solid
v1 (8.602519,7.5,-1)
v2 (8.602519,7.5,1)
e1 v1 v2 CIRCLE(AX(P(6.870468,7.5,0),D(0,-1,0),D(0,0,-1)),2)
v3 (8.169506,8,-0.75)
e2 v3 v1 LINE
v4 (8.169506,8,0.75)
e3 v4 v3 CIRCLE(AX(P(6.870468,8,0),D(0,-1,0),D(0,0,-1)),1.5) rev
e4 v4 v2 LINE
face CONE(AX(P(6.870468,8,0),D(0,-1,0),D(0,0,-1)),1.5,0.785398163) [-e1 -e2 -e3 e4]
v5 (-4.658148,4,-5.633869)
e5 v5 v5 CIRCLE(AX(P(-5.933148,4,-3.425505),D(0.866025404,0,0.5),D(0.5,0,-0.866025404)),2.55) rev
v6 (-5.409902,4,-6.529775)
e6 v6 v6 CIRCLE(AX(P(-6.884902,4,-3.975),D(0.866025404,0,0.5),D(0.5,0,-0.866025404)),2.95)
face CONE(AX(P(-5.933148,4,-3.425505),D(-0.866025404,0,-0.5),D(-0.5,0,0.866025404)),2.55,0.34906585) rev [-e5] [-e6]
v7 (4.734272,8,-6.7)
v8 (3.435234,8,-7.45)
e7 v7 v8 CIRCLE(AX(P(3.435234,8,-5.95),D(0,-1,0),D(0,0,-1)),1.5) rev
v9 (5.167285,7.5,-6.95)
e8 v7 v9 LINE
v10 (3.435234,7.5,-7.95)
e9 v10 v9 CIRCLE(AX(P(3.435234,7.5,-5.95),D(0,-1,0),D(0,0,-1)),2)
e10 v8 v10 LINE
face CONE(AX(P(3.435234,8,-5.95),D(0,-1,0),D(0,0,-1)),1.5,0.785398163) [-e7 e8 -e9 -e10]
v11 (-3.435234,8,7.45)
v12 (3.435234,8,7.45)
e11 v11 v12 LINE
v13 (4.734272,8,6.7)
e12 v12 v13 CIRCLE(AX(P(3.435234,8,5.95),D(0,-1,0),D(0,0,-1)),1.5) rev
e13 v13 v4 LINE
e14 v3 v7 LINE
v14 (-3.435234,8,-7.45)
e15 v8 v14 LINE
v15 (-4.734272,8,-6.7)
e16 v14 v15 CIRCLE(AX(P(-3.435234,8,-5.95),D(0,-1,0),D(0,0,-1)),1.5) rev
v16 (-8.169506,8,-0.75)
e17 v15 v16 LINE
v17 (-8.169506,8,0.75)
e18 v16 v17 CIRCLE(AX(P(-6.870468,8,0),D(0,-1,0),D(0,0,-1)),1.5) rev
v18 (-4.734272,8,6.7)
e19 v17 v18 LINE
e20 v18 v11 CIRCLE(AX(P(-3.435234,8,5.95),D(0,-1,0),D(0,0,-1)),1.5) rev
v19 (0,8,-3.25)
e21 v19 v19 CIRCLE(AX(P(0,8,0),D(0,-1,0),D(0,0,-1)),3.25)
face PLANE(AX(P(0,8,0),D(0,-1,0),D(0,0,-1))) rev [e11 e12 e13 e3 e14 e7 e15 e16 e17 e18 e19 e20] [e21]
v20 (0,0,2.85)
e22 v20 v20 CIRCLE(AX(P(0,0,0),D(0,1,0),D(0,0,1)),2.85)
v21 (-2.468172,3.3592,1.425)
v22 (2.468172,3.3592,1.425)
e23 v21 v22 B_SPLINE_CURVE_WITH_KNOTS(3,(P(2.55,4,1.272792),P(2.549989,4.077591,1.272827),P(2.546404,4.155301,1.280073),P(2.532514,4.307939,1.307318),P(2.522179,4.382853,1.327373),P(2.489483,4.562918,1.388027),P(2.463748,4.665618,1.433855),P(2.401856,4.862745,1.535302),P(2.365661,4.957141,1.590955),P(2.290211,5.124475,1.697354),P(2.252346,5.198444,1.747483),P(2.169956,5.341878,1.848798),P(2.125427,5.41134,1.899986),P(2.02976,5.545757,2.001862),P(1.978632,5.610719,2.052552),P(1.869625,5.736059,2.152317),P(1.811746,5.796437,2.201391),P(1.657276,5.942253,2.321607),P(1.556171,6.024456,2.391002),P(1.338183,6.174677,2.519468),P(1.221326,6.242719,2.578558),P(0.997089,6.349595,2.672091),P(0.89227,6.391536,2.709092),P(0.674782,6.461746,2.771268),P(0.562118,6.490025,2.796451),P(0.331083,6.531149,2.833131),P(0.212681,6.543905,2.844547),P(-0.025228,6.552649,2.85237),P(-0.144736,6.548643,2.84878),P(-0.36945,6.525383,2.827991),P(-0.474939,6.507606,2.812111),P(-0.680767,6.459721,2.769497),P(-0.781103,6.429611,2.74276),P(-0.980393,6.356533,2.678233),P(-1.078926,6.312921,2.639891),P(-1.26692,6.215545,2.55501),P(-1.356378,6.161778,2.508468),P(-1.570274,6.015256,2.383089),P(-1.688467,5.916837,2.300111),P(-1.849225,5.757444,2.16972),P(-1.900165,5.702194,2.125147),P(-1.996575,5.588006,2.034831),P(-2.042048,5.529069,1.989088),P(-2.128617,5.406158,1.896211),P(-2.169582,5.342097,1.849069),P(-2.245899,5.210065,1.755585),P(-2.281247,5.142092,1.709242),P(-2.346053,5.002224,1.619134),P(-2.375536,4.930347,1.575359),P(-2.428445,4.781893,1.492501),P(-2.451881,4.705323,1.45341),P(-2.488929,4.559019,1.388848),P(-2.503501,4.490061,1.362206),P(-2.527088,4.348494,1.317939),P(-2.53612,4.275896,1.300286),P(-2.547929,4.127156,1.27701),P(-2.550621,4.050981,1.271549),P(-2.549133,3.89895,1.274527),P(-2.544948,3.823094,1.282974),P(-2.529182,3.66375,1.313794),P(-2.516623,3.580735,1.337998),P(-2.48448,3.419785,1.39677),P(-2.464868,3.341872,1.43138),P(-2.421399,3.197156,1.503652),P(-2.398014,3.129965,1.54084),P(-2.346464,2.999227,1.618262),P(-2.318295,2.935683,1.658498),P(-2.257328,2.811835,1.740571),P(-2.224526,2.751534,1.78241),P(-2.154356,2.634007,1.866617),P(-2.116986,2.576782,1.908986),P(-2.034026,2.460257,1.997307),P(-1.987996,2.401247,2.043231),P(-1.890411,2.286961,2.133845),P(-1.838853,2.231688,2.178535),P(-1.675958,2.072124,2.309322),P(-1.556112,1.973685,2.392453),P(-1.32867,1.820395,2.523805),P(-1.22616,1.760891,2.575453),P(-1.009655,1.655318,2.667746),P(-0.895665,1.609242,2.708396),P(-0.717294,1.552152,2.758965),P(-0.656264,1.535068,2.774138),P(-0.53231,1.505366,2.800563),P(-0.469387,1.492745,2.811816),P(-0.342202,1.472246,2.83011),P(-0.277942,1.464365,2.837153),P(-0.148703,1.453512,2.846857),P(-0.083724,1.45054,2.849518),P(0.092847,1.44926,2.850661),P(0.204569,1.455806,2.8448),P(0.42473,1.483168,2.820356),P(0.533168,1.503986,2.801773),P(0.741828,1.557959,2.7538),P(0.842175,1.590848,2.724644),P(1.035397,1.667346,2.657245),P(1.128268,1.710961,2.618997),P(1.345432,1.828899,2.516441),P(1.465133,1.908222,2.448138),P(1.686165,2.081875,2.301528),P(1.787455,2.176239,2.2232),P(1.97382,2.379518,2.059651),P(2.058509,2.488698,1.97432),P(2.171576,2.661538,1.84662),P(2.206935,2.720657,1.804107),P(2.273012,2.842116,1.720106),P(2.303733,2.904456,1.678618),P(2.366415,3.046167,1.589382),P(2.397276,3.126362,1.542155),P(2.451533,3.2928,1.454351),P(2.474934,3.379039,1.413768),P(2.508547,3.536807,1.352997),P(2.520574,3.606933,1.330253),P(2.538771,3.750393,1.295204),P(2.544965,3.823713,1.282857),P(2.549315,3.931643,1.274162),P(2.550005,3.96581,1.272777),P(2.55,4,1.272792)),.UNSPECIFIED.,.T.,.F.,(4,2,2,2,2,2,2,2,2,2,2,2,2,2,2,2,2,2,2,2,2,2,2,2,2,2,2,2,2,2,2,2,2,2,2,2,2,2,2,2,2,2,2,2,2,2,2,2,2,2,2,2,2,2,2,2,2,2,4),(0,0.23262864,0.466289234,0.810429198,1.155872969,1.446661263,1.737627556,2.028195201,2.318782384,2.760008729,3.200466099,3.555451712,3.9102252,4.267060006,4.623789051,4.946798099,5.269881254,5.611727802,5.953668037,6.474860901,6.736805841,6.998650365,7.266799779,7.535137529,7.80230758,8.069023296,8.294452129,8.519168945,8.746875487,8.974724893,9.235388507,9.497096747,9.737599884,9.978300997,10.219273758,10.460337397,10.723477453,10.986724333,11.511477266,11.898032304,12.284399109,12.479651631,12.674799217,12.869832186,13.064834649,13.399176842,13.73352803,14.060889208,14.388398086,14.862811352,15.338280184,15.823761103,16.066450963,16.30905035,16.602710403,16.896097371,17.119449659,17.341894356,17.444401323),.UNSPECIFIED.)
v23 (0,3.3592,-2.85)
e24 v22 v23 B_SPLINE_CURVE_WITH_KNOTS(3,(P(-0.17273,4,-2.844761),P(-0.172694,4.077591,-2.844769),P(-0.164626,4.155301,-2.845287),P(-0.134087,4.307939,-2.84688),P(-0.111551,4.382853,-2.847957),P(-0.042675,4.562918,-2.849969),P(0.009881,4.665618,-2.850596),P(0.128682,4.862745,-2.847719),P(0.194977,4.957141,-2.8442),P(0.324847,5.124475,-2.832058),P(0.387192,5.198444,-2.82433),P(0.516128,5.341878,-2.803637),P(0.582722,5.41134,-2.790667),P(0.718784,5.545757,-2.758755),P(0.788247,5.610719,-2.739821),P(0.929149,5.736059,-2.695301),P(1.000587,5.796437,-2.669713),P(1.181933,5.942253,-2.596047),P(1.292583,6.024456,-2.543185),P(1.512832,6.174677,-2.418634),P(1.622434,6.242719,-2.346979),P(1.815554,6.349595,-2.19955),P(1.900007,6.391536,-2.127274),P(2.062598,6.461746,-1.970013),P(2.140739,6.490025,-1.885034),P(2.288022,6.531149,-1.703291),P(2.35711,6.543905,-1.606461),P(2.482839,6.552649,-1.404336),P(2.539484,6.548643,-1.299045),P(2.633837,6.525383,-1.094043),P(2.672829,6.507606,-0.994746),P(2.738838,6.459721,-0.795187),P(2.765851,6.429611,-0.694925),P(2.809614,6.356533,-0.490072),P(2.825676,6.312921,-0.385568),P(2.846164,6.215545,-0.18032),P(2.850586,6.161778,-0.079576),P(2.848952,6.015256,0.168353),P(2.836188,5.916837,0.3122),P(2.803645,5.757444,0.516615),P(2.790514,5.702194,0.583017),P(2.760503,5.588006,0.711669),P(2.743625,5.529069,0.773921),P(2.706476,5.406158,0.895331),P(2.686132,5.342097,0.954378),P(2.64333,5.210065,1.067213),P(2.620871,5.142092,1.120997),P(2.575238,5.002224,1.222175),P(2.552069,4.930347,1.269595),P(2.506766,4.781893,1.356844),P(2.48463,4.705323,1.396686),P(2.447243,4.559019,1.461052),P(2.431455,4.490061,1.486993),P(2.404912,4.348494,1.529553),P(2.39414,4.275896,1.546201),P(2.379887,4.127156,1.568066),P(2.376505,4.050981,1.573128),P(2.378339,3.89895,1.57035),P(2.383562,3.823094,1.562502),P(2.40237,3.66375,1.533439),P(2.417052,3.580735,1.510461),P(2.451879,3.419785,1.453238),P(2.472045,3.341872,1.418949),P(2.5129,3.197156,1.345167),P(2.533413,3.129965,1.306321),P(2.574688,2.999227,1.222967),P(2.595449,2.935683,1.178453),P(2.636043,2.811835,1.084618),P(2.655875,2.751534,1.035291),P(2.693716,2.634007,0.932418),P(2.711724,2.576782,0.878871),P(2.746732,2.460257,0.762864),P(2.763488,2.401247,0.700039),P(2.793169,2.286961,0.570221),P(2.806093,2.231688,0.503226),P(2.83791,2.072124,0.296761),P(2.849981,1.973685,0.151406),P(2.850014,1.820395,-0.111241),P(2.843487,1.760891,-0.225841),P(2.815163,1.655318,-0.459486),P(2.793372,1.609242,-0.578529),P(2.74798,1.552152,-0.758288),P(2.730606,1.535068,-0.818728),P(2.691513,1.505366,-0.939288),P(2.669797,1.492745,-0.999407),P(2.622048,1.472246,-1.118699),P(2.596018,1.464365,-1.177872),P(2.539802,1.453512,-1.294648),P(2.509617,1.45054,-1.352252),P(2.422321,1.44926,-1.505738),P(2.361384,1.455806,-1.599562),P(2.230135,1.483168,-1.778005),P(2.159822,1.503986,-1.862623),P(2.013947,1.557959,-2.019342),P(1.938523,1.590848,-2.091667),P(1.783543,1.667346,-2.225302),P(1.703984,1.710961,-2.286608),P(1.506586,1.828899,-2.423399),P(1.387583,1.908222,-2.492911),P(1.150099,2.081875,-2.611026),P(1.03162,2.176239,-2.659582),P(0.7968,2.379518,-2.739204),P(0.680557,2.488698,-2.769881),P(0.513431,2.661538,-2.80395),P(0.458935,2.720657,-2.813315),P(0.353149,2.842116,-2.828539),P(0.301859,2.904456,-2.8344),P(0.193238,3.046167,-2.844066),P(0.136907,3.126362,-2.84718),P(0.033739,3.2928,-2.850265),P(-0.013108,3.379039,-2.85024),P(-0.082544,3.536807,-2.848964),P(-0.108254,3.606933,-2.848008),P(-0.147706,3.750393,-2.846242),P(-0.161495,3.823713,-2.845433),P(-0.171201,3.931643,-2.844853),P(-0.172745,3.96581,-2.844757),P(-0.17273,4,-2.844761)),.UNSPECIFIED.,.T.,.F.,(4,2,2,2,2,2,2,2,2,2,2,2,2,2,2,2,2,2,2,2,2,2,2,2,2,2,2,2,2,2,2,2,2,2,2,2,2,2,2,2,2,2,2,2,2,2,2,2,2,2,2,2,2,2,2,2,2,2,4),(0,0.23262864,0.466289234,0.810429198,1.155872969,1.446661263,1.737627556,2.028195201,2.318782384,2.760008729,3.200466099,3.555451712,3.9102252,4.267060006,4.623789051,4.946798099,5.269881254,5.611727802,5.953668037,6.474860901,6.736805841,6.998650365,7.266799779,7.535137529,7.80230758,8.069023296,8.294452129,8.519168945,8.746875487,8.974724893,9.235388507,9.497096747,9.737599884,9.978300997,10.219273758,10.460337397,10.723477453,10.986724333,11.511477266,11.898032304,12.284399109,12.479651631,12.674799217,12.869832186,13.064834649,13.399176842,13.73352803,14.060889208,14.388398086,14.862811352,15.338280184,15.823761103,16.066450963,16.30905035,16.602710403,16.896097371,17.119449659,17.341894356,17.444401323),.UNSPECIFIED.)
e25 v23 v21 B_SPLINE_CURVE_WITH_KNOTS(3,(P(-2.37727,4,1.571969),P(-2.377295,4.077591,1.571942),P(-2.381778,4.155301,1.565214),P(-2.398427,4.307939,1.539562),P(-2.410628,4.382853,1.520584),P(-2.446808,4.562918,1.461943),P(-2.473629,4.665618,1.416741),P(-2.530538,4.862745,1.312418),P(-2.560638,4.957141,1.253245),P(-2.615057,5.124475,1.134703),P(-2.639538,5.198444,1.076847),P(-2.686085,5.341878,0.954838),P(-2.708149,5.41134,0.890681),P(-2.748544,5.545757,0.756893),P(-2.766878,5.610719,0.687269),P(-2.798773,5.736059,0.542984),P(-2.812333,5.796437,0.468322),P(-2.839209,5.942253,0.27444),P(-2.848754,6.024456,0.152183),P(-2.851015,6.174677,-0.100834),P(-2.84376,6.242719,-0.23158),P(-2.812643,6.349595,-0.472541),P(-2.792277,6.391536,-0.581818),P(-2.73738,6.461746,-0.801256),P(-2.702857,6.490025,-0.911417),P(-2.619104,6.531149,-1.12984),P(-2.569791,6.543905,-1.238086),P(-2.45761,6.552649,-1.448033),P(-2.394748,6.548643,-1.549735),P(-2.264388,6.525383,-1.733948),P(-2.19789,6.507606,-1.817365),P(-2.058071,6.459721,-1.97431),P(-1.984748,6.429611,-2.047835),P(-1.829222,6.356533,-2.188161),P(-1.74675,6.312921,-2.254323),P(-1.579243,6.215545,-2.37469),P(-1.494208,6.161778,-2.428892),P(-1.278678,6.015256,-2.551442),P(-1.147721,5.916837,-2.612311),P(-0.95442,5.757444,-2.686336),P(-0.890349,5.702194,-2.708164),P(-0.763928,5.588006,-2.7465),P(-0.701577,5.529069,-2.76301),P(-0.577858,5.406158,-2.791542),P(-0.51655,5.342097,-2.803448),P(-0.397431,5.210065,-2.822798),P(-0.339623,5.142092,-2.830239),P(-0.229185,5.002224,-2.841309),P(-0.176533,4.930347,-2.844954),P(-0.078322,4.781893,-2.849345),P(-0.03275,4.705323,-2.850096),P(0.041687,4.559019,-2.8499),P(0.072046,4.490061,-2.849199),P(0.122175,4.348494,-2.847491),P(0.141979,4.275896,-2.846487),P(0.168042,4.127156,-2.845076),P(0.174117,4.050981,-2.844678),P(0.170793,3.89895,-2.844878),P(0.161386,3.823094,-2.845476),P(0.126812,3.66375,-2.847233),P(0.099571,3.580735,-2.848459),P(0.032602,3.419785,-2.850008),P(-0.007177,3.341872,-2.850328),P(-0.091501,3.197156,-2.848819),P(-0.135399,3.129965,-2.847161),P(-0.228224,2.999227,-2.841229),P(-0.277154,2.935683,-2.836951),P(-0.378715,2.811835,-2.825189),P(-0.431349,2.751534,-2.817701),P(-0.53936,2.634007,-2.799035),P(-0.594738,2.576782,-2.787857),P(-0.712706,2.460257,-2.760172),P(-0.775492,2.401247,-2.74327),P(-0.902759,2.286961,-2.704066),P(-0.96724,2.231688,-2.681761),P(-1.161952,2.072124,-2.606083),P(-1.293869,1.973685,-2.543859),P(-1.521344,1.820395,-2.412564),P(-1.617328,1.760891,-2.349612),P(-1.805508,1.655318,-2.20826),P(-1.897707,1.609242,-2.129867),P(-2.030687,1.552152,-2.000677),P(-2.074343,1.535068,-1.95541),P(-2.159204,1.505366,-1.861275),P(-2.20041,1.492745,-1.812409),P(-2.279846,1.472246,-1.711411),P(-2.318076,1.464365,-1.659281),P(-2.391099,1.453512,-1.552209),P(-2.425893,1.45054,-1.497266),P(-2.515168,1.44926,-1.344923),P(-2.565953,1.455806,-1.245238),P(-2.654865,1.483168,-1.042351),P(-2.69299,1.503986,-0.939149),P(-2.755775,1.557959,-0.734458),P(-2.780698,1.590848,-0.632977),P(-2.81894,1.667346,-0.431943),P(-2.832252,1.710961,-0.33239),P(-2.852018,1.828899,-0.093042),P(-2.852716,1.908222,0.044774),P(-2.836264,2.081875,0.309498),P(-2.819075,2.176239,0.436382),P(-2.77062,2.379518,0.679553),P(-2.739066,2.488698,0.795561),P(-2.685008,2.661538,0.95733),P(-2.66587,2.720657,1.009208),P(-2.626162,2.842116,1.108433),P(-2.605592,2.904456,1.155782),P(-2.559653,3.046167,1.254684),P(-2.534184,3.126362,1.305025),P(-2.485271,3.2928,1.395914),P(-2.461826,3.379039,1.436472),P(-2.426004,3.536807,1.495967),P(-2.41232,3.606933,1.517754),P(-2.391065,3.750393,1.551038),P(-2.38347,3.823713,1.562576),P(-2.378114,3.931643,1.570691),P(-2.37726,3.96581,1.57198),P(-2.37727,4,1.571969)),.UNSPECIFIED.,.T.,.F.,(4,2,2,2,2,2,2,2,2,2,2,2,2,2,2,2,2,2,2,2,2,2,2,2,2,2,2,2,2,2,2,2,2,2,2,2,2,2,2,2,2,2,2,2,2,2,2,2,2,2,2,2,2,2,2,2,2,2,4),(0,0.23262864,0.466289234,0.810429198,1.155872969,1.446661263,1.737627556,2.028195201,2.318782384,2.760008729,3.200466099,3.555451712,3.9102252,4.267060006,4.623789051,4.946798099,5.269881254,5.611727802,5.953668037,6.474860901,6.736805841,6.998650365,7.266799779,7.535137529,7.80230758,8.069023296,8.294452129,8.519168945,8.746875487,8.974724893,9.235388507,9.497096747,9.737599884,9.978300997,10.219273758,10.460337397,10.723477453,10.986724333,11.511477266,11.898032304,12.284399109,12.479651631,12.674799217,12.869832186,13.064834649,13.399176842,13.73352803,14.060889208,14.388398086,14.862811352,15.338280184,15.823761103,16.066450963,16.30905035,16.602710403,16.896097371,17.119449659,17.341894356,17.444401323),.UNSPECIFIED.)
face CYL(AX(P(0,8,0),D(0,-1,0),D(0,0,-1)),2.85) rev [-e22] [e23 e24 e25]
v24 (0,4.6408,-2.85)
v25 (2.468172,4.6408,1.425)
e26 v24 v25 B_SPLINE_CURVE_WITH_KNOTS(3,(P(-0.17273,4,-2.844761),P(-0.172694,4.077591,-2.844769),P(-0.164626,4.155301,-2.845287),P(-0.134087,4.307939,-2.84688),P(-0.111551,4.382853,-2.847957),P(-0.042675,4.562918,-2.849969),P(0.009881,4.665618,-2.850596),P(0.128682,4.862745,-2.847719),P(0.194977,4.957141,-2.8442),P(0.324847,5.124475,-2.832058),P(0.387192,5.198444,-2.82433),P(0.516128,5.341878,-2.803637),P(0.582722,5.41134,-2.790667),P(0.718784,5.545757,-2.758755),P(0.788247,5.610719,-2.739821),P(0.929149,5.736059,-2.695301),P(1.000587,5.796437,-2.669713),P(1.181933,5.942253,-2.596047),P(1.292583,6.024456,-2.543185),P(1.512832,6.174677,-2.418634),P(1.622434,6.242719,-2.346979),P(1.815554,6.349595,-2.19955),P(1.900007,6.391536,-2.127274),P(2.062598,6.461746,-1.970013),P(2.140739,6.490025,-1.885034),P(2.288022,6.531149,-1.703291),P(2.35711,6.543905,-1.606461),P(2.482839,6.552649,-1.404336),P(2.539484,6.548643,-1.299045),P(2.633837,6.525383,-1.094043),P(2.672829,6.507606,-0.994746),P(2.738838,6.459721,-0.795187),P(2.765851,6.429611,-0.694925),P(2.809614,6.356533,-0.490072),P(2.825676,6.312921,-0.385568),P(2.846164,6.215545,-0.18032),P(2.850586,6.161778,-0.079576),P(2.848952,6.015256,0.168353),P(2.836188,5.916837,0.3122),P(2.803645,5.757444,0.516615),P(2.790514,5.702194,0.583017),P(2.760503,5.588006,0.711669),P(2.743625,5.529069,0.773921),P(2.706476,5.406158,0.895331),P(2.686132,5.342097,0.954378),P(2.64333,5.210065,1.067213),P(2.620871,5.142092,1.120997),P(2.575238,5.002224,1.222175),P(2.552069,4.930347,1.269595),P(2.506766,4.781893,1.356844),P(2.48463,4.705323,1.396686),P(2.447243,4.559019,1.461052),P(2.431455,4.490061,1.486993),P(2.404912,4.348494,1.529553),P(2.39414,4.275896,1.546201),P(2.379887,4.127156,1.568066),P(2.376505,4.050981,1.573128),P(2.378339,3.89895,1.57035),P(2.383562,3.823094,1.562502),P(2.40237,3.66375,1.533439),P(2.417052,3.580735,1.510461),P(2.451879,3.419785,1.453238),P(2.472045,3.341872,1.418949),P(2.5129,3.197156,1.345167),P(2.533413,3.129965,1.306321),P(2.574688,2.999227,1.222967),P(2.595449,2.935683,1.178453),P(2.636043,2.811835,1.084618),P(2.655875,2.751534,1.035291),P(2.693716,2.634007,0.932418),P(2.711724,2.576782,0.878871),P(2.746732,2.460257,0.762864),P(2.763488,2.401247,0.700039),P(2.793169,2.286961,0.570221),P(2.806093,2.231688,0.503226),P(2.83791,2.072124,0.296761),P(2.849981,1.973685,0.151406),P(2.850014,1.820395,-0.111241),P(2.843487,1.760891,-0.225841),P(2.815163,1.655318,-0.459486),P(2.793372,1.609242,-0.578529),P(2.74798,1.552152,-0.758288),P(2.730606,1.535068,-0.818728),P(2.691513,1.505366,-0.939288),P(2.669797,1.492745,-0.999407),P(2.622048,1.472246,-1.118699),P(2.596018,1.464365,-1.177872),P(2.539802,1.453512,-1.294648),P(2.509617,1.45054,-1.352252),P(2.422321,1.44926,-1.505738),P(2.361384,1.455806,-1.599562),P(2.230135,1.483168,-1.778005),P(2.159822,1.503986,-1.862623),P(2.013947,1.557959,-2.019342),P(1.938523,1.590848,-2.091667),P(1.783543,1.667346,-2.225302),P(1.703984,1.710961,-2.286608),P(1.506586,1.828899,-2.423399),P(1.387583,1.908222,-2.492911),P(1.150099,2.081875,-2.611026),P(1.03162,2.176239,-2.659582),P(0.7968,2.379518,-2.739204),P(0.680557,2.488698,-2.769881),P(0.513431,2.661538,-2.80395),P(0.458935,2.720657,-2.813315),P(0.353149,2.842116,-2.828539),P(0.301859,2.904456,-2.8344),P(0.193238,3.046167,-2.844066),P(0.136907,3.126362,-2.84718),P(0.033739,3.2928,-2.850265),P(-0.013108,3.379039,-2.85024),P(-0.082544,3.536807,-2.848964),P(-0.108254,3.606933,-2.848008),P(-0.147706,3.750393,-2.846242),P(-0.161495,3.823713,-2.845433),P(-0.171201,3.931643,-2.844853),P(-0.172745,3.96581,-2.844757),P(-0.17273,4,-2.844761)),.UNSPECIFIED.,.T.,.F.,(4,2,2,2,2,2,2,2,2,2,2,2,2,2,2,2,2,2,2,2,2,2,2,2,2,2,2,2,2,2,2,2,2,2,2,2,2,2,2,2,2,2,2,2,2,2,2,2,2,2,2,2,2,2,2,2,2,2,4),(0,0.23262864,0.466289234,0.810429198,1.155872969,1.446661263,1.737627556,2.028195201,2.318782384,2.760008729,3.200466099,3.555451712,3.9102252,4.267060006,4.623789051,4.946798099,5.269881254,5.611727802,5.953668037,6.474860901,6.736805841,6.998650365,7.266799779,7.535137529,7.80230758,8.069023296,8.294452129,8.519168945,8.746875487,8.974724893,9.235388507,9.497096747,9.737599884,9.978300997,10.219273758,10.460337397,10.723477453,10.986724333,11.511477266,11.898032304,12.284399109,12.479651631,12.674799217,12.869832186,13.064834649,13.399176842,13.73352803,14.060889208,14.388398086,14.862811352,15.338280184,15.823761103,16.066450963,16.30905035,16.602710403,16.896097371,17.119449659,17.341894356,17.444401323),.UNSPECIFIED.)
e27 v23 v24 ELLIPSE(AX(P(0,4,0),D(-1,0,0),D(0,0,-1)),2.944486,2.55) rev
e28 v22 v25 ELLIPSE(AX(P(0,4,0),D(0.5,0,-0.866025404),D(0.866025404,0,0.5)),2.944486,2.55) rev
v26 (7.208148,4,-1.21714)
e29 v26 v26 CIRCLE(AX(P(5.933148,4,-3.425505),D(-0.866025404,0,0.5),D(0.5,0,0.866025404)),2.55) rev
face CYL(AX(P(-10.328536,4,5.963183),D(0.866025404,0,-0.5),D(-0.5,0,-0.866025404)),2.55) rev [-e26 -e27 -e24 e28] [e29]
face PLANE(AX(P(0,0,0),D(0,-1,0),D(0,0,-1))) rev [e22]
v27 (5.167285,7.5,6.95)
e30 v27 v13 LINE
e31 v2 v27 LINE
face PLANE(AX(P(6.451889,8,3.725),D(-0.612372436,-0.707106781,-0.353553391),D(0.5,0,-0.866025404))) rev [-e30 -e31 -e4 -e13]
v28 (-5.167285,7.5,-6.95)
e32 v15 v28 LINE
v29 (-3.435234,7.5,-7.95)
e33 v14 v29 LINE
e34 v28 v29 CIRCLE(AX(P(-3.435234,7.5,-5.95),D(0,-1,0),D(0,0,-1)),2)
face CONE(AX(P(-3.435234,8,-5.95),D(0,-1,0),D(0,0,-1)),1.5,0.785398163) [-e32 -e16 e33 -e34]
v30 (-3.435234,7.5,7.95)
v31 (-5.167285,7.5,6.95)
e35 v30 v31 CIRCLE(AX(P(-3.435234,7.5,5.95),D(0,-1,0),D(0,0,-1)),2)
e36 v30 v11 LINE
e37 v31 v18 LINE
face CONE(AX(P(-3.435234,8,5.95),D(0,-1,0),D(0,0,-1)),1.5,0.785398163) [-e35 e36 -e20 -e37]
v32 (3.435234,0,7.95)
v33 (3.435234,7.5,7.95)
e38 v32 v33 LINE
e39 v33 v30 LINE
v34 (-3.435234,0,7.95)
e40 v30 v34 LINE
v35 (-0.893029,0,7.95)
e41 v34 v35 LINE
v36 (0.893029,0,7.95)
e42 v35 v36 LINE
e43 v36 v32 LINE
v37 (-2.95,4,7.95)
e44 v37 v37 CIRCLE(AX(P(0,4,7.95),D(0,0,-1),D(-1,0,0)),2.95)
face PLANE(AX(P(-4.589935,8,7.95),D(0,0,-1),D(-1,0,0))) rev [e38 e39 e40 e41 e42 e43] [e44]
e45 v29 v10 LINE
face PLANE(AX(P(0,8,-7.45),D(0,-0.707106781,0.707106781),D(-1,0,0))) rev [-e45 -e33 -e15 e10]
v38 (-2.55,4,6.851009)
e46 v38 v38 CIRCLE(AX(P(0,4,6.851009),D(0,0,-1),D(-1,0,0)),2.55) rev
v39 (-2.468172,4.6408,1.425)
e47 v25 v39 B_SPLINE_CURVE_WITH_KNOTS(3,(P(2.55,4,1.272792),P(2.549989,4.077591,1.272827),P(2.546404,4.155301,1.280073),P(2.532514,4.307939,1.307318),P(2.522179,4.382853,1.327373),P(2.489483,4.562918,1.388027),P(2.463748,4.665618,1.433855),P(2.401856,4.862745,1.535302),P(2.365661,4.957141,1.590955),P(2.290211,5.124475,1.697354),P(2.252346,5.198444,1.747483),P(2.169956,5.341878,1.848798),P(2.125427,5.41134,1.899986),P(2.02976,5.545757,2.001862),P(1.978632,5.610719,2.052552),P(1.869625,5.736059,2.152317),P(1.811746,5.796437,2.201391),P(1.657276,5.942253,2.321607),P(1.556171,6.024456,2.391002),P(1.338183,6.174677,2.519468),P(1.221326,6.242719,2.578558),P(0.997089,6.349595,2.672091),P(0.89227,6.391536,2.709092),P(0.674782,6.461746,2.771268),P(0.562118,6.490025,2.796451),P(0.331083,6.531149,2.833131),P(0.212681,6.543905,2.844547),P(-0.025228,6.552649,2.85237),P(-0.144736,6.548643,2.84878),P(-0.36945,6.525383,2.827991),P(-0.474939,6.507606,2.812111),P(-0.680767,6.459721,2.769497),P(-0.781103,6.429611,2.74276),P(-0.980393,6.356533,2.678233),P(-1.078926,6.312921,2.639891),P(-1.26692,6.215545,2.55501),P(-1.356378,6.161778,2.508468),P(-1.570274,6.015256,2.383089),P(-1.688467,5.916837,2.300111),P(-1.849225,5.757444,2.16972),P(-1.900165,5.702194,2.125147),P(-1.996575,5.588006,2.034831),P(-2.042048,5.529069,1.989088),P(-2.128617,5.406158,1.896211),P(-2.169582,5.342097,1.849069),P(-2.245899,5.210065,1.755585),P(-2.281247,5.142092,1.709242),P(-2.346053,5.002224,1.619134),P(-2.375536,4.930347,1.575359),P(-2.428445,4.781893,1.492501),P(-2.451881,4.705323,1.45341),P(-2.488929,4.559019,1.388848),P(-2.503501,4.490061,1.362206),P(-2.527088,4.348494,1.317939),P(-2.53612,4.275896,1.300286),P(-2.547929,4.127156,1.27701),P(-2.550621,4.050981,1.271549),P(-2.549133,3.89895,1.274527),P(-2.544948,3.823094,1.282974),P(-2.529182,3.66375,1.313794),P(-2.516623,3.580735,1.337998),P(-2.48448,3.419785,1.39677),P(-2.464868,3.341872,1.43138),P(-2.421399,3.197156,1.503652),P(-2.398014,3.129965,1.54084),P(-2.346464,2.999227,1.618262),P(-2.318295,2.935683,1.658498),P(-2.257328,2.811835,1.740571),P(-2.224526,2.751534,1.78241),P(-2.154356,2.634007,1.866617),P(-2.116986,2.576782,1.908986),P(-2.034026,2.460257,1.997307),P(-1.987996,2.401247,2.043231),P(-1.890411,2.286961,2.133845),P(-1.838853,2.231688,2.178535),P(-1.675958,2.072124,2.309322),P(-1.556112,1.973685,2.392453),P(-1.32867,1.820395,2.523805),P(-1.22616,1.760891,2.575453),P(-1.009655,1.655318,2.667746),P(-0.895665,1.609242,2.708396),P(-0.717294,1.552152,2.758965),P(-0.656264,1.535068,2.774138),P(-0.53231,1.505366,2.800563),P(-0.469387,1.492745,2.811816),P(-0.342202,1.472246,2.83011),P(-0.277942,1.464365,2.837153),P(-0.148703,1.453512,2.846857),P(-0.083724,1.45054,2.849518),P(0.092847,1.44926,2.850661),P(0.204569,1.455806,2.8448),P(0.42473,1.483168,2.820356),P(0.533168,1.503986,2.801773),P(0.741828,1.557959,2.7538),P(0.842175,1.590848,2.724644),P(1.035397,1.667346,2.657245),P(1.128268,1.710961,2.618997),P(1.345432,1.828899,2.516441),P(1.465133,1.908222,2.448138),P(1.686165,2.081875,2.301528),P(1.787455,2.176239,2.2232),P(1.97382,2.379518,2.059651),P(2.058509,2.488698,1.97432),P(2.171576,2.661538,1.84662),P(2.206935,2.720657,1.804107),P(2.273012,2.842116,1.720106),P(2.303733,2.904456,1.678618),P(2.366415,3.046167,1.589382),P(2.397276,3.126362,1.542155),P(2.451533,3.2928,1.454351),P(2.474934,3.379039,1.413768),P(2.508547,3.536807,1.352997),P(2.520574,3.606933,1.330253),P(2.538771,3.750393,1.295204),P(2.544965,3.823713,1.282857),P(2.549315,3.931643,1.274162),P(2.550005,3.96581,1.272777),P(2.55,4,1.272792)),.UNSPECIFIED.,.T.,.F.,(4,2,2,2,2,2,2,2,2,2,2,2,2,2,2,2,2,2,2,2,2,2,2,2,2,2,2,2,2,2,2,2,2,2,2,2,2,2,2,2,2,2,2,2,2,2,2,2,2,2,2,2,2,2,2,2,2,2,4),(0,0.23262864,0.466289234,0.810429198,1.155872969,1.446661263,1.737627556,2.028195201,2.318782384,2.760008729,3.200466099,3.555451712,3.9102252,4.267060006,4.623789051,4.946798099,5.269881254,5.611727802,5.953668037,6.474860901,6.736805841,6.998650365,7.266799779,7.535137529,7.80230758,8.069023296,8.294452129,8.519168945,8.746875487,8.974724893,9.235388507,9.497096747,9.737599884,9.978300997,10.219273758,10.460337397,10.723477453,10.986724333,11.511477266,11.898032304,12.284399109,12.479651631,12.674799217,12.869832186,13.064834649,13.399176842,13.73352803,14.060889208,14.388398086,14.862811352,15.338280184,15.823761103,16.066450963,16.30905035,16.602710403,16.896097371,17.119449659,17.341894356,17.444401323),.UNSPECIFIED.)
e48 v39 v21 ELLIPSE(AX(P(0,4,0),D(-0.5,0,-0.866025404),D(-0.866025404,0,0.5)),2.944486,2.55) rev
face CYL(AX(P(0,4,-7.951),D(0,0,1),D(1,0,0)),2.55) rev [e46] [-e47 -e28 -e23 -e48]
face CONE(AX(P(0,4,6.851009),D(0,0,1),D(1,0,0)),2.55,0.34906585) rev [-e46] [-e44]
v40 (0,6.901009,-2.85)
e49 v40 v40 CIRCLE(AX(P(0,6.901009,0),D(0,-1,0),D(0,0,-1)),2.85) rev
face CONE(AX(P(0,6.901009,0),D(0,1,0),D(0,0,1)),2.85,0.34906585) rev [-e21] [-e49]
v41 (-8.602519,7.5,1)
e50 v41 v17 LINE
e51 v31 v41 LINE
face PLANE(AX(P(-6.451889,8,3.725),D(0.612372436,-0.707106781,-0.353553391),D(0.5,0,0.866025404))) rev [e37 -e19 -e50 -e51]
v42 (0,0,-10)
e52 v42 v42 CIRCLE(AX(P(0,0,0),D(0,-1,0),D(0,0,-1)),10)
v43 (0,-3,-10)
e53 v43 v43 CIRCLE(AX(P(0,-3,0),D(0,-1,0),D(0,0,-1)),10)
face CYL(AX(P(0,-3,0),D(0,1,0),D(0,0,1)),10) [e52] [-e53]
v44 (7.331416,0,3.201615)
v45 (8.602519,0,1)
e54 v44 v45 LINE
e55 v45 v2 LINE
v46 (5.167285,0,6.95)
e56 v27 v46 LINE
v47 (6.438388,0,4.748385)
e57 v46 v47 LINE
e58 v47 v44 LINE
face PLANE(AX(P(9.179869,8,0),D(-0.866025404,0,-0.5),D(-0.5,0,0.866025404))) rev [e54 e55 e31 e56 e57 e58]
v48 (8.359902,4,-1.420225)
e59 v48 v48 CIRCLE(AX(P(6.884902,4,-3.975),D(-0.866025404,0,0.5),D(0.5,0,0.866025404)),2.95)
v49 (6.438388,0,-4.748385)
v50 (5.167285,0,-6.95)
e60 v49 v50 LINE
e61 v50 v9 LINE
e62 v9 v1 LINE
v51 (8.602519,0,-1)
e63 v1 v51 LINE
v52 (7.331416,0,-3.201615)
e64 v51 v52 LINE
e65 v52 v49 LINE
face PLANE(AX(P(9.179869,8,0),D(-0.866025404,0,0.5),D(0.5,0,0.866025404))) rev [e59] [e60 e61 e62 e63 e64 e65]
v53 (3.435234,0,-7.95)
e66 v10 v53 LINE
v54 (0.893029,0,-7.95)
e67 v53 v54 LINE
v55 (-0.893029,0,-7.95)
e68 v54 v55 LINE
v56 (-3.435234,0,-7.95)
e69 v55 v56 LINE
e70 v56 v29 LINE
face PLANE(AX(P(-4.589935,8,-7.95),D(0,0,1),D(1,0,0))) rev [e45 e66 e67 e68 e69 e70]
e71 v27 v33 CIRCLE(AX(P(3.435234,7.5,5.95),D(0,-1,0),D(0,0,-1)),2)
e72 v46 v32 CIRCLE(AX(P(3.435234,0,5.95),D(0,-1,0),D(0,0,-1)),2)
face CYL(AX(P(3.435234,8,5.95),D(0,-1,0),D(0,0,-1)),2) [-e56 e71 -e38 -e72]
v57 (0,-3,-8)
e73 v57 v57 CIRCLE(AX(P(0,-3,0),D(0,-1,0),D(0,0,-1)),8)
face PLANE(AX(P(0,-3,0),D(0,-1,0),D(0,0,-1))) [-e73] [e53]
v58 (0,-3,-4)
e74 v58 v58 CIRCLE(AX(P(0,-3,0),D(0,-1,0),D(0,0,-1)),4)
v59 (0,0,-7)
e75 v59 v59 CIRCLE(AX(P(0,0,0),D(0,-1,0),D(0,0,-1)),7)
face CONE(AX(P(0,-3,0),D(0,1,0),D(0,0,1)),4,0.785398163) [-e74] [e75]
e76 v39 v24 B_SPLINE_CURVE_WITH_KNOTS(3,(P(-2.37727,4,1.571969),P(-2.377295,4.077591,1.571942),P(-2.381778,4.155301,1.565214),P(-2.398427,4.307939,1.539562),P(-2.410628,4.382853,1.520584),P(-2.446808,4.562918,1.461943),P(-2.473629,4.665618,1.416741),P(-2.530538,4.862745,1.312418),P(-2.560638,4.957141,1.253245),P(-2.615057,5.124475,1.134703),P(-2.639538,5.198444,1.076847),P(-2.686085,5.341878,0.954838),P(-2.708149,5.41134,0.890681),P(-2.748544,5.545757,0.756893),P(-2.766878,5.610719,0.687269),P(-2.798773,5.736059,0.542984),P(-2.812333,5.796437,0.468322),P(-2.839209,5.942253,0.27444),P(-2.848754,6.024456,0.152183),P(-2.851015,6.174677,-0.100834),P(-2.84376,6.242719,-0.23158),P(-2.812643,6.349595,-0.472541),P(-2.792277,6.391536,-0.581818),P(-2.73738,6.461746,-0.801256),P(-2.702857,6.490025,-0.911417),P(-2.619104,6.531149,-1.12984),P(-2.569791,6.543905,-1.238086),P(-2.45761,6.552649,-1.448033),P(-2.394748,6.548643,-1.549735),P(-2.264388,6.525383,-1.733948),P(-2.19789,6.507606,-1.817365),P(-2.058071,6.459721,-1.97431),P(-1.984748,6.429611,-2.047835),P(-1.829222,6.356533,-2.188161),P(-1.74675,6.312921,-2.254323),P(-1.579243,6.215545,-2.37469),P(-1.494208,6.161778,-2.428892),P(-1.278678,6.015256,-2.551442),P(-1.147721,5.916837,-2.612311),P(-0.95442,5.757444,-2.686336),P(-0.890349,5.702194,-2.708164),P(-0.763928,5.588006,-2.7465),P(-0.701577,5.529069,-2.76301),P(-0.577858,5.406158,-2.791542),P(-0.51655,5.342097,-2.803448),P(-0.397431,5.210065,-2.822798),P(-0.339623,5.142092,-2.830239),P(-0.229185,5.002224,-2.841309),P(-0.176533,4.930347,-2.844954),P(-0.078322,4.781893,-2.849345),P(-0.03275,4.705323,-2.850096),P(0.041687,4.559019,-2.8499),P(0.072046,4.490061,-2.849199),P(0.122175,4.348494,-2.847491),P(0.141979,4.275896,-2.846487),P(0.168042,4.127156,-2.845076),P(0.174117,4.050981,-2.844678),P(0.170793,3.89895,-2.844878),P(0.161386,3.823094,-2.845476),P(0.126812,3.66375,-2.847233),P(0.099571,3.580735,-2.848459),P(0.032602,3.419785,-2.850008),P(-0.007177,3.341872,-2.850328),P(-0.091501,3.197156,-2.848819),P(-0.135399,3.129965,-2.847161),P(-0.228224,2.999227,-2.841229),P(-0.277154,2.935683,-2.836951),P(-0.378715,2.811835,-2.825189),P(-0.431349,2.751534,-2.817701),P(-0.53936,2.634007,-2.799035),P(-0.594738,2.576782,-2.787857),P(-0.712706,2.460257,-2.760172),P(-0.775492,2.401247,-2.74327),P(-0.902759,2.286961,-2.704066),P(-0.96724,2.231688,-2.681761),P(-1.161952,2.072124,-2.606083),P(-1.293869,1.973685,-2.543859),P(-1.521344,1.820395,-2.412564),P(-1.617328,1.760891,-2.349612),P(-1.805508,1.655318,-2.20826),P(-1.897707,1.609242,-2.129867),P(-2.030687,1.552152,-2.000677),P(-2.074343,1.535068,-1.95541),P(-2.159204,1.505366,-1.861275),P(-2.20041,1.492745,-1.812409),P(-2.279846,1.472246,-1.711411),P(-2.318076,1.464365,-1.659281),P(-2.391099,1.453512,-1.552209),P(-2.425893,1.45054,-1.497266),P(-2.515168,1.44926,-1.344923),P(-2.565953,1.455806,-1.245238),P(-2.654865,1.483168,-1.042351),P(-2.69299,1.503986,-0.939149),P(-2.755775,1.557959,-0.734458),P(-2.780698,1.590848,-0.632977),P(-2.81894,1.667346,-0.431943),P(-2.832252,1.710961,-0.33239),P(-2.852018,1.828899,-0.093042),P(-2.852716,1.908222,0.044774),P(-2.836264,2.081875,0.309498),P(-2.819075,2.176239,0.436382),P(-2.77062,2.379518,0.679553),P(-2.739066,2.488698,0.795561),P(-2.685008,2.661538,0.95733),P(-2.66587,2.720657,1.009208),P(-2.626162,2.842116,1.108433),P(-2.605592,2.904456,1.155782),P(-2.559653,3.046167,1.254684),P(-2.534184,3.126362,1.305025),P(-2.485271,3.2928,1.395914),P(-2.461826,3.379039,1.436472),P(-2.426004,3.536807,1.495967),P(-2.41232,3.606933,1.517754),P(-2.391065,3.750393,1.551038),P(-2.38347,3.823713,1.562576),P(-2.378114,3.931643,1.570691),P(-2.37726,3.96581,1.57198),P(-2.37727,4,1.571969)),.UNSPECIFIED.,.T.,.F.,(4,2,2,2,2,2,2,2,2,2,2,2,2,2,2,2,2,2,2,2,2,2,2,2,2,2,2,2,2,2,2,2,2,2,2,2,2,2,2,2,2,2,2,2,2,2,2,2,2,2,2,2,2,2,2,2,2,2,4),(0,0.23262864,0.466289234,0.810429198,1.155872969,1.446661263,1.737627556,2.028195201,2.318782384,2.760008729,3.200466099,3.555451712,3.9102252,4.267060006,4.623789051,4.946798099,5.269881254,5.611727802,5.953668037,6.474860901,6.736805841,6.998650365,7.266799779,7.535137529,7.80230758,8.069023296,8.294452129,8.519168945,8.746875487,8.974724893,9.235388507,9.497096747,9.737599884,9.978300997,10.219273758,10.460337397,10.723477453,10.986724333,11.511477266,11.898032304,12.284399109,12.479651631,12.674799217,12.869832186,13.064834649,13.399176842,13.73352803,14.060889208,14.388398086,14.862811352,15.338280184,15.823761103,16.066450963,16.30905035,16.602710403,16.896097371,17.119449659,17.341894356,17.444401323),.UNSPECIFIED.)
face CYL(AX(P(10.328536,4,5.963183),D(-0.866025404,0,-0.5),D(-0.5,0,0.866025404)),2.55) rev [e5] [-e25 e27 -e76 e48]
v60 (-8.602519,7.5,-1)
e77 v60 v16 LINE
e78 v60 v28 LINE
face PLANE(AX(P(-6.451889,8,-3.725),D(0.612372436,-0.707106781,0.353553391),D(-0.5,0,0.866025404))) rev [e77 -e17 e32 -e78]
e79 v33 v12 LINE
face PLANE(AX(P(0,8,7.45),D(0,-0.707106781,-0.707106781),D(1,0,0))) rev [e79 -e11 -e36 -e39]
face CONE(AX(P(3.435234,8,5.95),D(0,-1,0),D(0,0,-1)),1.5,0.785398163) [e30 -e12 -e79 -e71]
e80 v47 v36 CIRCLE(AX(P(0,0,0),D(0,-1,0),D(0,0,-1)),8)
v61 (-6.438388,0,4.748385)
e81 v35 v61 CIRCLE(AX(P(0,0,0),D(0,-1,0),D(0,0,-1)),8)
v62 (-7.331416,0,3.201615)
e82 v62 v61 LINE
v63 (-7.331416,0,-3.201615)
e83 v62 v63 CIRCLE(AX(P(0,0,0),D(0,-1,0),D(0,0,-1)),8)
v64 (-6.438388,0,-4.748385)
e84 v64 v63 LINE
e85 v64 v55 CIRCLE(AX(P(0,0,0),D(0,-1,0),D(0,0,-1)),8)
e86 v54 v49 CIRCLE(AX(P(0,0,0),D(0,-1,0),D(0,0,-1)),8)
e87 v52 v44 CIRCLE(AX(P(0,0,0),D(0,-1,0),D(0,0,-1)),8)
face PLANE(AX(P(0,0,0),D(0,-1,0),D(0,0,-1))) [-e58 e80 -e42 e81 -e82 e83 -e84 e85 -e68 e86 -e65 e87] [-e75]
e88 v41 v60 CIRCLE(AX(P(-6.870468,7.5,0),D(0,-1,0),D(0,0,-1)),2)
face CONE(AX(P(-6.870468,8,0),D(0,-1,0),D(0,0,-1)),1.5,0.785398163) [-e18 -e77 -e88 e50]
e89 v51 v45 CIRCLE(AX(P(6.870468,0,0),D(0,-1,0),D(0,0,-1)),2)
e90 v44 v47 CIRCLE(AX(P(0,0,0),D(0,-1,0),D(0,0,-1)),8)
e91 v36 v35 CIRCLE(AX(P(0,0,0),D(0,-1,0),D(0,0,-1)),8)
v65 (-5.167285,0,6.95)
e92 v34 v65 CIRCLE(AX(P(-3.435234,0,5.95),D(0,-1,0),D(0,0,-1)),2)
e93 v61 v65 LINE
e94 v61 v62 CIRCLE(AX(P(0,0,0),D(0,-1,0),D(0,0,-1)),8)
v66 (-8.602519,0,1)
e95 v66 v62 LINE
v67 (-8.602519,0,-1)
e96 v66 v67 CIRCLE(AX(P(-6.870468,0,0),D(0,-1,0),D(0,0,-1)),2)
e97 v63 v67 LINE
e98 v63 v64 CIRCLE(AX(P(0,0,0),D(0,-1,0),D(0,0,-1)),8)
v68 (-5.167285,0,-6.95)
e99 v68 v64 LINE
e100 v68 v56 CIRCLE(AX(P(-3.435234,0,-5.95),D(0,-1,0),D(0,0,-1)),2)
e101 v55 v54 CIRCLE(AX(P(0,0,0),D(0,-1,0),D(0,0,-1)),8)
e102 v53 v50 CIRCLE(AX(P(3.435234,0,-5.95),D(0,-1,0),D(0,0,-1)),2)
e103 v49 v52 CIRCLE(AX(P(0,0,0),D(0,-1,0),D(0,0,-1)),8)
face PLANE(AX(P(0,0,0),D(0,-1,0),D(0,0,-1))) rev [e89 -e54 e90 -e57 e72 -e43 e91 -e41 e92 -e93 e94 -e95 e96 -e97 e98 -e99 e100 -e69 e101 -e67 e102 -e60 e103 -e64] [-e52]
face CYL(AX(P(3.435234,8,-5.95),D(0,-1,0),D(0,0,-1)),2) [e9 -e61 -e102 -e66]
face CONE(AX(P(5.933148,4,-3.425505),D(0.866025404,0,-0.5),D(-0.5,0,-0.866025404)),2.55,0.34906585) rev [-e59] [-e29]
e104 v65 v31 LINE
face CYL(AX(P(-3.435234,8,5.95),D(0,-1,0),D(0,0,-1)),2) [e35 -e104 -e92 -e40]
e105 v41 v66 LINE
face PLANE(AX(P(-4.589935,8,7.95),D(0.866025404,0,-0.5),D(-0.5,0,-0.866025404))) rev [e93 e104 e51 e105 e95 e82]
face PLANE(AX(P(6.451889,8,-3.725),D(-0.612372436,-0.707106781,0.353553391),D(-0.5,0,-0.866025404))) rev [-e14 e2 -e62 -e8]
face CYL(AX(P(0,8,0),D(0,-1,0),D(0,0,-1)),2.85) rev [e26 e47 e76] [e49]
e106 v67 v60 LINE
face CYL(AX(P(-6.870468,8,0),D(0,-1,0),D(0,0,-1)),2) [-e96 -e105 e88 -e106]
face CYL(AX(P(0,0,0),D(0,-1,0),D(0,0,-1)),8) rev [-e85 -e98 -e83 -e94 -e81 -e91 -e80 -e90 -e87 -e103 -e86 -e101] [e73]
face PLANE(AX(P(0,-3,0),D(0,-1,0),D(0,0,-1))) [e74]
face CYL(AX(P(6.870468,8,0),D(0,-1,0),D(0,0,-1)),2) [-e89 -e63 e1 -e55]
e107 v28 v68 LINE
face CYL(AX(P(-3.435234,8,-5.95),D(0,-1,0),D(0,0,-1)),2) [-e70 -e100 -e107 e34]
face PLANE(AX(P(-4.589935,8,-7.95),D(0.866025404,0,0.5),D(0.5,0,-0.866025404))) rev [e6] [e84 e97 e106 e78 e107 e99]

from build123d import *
from OCP.BRepFilletAPI import BRepFilletAPI_MakeChamfer

# Parameters (mm, degrees)
SKETCH1_R               = 2.85
BOSS_EXTRUDE1_DEPTH     = 8
CUT_EXTRUDE1_REACH      = 22.027
CUT_EXTRUDE1_END_RADIUS = 2.85
SKETCH2_R               = 2.55
CIRPATTERN1_COUNT       = 3
CHAMFER1_SIZE           = 0.4
CHAMFER1_SIZE2          = 1.098990968
FILLET1_R               = 2
SKETCH3_R               = 10
BOSS_EXTRUDE2_DEPTH     = 3
SKETCH4_R               = 8
SKETCH4_R_2             = 7
CUT_EXTRUDE2_DEPTH      = 3
CHAMFER3_SIZE           = 3
CHAMFER2_SIZE           = 0.5


with BuildPart() as part:
    # Sketch1 → Boss-Extrude1 (new body)
    with BuildSketch(Plane(origin=(0, 0, 0), x_dir=(1, 0, 0), z_dir=(0, 1, 0))):
        Polygon((-4.58993464, 7.95), (4.58993464, 7.95), (9.17986928, 0), (4.58993464, -7.95), (-4.58993464, -7.95), (-9.17986928, 0), align=None)
        with Locations(Location((0, 0, 0), (0, 0, 270))):
            Circle(SKETCH1_R, mode=Mode.SUBTRACT)
    extrude(amount=BOSS_EXTRUDE1_DEPTH)

    # Cut-Extrude1: up to this cylinder (the profile starts outside it)
    cut_extrude1_end = Plane(origin=(0, 4, 0), z_dir=(0, -1, 0)) * Cylinder(CUT_EXTRUDE1_END_RADIUS, 50.754, mode=Mode.PRIVATE)
    # Sketch2 → Cut-Extrude1 (cut, up to the surface)
    with BuildSketch(Plane.XY.offset(7.95), mode=Mode.PRIVATE) as cut_extrude1_sk1:
        with Locations((0, 4)):
            Circle(SKETCH2_R)
    cut_extrude1_tool1 = extrude(cut_extrude1_sk1.sketch, amount=-CUT_EXTRUDE1_REACH, mode=Mode.PRIVATE) - cut_extrude1_end
    cut_extrude1 = cut_extrude1_tool1.solids().sort_by_distance((0, 4, 7.95))[0]
    add(cut_extrude1, mode=Mode.SUBTRACT)

    # CirPattern1: Cut-Extrude1 ×3 about axis
    cirpattern1_axis = Axis((0, 8, 0), (0, -1, 0))
    for i in range(1, CIRPATTERN1_COUNT):
        add(cut_extrude1.rotate(cirpattern1_axis, i * 360 / CIRPATTERN1_COUNT), mode=Mode.SUBTRACT)

    # Chamfer1: one chamfer whose edges measure the first distance from different faces: ONE call of the kernel's chamfer builder (chamfer() names one face for all edges)
    chamfer1_edges_1 = [part.edges().sort_by_distance(p)[0] for p in [
        (0, 8, -2.85),
    ]]
    chamfer1_side_1 = [part.faces().sort_by_distance(p)[0] for p in [
        (0, 8, -7.707123488),
    ]]
    chamfer1_edges_2 = [part.edges().sort_by_distance(p)[0] for p in [
        (-2.55, 4, 7.95),
    ]]
    chamfer1_side_2 = [part.faces().sort_by_distance(p)[0] for p in [
        (4.468168471, 4, 7.95),
    ]]
    chamfer1_edges_3 = [part.edges().sort_by_distance(p)[0] for p in [
        (-5.60990196, 4, -6.18336478),
    ]]
    chamfer1_side_3 = [part.faces().sort_by_distance(p)[0] for p in [
        (-9.118986195, 4, -0.105452596),
    ]]
    chamfer1_edges_4 = [part.edges().sort_by_distance(p)[0] for p in [
        (8.15990196, 4, -1.76663522),
    ]]
    chamfer1_side_4 = [part.faces().sort_by_distance(p)[0] for p in [
        (4.650817725, 4, -7.844547404),
    ]]
    chamfer1 = BRepFilletAPI_MakeChamfer(part.part.solid().wrapped)
    for e in chamfer1_edges_1:
        chamfer1.Add(CHAMFER1_SIZE, CHAMFER1_SIZE2, e.wrapped, chamfer1_side_1[0].wrapped)  # the first distance lies on this face
    for e in chamfer1_edges_2:
        chamfer1.Add(CHAMFER1_SIZE, CHAMFER1_SIZE2, e.wrapped, chamfer1_side_2[0].wrapped)  # the first distance lies on this face
    for e in chamfer1_edges_3:
        chamfer1.Add(CHAMFER1_SIZE, CHAMFER1_SIZE2, e.wrapped, chamfer1_side_3[0].wrapped)  # the first distance lies on this face
    for e in chamfer1_edges_4:
        chamfer1.Add(CHAMFER1_SIZE, CHAMFER1_SIZE2, e.wrapped, chamfer1_side_4[0].wrapped)  # the first distance lies on this face
    add(Compound.cast(chamfer1.Shape()), mode=Mode.REPLACE)

    # Fillet1
    fillet1_edges = [part.edges().sort_by_distance(p)[0] for p in [
        (-4.58993464, 4, 7.95),
        (-9.17986928, 4, 0),
        (-4.58993464, 4, -7.95),
        (4.58993464, 4, -7.95),
        (9.17986928, 4, 0),
        (4.58993464, 4, 7.95),
    ]]
    fillet(fillet1_edges, radius=FILLET1_R)

    # Sketch3 → Boss-Extrude2 (add)
    with BuildSketch(Plane.XZ):
        with Locations(Location((0, 0, 0), (0, 0, 270))):
            Circle(SKETCH3_R)
    extrude(amount=BOSS_EXTRUDE2_DEPTH)

    # Sketch4 → Cut-Extrude2 (cut)
    with BuildSketch(Plane.XZ.offset(3)):
        with Locations(Location((0, 0, 0), (0, 0, 270))):
            Circle(SKETCH4_R)
        with Locations(Location((0, 0, 0), (0, 0, 270))):
            Circle(SKETCH4_R_2, mode=Mode.SUBTRACT)
    extrude(amount=-CUT_EXTRUDE2_DEPTH, mode=Mode.SUBTRACT)

    # Chamfer3
    chamfer3_edges = [part.edges().sort_by_distance(p)[0] for p in [
        (0, -3, 7),
    ]]
    chamfer(chamfer3_edges, length=CHAMFER3_SIZE - 0.0001)  # a hair under: the kernel refuses the full size

    # Chamfer2
    chamfer2_edges = [part.edges().sort_by_distance(p)[0] for p in [
        (-6.88490196, 8, 3.975),
        (-6.88490196, 8, -3.975),
        (0, 8, 7.95),
        (6.88490196, 8, 3.975),
        (6.88490196, 8, -3.975),
        (0, 8, -7.95),
        (4.435234102, 8, -7.682050808),
        (-4.435234102, 8, -7.682050808),
        (8.870468203, 8, 0),
        (4.435234102, 8, 7.682050808),
        (-4.435234102, 8, 7.682050808),
        (-8.870468203, 8, 0),
    ]]
    chamfer(chamfer2_edges, length=CHAMFER2_SIZE)


solid = part.part
